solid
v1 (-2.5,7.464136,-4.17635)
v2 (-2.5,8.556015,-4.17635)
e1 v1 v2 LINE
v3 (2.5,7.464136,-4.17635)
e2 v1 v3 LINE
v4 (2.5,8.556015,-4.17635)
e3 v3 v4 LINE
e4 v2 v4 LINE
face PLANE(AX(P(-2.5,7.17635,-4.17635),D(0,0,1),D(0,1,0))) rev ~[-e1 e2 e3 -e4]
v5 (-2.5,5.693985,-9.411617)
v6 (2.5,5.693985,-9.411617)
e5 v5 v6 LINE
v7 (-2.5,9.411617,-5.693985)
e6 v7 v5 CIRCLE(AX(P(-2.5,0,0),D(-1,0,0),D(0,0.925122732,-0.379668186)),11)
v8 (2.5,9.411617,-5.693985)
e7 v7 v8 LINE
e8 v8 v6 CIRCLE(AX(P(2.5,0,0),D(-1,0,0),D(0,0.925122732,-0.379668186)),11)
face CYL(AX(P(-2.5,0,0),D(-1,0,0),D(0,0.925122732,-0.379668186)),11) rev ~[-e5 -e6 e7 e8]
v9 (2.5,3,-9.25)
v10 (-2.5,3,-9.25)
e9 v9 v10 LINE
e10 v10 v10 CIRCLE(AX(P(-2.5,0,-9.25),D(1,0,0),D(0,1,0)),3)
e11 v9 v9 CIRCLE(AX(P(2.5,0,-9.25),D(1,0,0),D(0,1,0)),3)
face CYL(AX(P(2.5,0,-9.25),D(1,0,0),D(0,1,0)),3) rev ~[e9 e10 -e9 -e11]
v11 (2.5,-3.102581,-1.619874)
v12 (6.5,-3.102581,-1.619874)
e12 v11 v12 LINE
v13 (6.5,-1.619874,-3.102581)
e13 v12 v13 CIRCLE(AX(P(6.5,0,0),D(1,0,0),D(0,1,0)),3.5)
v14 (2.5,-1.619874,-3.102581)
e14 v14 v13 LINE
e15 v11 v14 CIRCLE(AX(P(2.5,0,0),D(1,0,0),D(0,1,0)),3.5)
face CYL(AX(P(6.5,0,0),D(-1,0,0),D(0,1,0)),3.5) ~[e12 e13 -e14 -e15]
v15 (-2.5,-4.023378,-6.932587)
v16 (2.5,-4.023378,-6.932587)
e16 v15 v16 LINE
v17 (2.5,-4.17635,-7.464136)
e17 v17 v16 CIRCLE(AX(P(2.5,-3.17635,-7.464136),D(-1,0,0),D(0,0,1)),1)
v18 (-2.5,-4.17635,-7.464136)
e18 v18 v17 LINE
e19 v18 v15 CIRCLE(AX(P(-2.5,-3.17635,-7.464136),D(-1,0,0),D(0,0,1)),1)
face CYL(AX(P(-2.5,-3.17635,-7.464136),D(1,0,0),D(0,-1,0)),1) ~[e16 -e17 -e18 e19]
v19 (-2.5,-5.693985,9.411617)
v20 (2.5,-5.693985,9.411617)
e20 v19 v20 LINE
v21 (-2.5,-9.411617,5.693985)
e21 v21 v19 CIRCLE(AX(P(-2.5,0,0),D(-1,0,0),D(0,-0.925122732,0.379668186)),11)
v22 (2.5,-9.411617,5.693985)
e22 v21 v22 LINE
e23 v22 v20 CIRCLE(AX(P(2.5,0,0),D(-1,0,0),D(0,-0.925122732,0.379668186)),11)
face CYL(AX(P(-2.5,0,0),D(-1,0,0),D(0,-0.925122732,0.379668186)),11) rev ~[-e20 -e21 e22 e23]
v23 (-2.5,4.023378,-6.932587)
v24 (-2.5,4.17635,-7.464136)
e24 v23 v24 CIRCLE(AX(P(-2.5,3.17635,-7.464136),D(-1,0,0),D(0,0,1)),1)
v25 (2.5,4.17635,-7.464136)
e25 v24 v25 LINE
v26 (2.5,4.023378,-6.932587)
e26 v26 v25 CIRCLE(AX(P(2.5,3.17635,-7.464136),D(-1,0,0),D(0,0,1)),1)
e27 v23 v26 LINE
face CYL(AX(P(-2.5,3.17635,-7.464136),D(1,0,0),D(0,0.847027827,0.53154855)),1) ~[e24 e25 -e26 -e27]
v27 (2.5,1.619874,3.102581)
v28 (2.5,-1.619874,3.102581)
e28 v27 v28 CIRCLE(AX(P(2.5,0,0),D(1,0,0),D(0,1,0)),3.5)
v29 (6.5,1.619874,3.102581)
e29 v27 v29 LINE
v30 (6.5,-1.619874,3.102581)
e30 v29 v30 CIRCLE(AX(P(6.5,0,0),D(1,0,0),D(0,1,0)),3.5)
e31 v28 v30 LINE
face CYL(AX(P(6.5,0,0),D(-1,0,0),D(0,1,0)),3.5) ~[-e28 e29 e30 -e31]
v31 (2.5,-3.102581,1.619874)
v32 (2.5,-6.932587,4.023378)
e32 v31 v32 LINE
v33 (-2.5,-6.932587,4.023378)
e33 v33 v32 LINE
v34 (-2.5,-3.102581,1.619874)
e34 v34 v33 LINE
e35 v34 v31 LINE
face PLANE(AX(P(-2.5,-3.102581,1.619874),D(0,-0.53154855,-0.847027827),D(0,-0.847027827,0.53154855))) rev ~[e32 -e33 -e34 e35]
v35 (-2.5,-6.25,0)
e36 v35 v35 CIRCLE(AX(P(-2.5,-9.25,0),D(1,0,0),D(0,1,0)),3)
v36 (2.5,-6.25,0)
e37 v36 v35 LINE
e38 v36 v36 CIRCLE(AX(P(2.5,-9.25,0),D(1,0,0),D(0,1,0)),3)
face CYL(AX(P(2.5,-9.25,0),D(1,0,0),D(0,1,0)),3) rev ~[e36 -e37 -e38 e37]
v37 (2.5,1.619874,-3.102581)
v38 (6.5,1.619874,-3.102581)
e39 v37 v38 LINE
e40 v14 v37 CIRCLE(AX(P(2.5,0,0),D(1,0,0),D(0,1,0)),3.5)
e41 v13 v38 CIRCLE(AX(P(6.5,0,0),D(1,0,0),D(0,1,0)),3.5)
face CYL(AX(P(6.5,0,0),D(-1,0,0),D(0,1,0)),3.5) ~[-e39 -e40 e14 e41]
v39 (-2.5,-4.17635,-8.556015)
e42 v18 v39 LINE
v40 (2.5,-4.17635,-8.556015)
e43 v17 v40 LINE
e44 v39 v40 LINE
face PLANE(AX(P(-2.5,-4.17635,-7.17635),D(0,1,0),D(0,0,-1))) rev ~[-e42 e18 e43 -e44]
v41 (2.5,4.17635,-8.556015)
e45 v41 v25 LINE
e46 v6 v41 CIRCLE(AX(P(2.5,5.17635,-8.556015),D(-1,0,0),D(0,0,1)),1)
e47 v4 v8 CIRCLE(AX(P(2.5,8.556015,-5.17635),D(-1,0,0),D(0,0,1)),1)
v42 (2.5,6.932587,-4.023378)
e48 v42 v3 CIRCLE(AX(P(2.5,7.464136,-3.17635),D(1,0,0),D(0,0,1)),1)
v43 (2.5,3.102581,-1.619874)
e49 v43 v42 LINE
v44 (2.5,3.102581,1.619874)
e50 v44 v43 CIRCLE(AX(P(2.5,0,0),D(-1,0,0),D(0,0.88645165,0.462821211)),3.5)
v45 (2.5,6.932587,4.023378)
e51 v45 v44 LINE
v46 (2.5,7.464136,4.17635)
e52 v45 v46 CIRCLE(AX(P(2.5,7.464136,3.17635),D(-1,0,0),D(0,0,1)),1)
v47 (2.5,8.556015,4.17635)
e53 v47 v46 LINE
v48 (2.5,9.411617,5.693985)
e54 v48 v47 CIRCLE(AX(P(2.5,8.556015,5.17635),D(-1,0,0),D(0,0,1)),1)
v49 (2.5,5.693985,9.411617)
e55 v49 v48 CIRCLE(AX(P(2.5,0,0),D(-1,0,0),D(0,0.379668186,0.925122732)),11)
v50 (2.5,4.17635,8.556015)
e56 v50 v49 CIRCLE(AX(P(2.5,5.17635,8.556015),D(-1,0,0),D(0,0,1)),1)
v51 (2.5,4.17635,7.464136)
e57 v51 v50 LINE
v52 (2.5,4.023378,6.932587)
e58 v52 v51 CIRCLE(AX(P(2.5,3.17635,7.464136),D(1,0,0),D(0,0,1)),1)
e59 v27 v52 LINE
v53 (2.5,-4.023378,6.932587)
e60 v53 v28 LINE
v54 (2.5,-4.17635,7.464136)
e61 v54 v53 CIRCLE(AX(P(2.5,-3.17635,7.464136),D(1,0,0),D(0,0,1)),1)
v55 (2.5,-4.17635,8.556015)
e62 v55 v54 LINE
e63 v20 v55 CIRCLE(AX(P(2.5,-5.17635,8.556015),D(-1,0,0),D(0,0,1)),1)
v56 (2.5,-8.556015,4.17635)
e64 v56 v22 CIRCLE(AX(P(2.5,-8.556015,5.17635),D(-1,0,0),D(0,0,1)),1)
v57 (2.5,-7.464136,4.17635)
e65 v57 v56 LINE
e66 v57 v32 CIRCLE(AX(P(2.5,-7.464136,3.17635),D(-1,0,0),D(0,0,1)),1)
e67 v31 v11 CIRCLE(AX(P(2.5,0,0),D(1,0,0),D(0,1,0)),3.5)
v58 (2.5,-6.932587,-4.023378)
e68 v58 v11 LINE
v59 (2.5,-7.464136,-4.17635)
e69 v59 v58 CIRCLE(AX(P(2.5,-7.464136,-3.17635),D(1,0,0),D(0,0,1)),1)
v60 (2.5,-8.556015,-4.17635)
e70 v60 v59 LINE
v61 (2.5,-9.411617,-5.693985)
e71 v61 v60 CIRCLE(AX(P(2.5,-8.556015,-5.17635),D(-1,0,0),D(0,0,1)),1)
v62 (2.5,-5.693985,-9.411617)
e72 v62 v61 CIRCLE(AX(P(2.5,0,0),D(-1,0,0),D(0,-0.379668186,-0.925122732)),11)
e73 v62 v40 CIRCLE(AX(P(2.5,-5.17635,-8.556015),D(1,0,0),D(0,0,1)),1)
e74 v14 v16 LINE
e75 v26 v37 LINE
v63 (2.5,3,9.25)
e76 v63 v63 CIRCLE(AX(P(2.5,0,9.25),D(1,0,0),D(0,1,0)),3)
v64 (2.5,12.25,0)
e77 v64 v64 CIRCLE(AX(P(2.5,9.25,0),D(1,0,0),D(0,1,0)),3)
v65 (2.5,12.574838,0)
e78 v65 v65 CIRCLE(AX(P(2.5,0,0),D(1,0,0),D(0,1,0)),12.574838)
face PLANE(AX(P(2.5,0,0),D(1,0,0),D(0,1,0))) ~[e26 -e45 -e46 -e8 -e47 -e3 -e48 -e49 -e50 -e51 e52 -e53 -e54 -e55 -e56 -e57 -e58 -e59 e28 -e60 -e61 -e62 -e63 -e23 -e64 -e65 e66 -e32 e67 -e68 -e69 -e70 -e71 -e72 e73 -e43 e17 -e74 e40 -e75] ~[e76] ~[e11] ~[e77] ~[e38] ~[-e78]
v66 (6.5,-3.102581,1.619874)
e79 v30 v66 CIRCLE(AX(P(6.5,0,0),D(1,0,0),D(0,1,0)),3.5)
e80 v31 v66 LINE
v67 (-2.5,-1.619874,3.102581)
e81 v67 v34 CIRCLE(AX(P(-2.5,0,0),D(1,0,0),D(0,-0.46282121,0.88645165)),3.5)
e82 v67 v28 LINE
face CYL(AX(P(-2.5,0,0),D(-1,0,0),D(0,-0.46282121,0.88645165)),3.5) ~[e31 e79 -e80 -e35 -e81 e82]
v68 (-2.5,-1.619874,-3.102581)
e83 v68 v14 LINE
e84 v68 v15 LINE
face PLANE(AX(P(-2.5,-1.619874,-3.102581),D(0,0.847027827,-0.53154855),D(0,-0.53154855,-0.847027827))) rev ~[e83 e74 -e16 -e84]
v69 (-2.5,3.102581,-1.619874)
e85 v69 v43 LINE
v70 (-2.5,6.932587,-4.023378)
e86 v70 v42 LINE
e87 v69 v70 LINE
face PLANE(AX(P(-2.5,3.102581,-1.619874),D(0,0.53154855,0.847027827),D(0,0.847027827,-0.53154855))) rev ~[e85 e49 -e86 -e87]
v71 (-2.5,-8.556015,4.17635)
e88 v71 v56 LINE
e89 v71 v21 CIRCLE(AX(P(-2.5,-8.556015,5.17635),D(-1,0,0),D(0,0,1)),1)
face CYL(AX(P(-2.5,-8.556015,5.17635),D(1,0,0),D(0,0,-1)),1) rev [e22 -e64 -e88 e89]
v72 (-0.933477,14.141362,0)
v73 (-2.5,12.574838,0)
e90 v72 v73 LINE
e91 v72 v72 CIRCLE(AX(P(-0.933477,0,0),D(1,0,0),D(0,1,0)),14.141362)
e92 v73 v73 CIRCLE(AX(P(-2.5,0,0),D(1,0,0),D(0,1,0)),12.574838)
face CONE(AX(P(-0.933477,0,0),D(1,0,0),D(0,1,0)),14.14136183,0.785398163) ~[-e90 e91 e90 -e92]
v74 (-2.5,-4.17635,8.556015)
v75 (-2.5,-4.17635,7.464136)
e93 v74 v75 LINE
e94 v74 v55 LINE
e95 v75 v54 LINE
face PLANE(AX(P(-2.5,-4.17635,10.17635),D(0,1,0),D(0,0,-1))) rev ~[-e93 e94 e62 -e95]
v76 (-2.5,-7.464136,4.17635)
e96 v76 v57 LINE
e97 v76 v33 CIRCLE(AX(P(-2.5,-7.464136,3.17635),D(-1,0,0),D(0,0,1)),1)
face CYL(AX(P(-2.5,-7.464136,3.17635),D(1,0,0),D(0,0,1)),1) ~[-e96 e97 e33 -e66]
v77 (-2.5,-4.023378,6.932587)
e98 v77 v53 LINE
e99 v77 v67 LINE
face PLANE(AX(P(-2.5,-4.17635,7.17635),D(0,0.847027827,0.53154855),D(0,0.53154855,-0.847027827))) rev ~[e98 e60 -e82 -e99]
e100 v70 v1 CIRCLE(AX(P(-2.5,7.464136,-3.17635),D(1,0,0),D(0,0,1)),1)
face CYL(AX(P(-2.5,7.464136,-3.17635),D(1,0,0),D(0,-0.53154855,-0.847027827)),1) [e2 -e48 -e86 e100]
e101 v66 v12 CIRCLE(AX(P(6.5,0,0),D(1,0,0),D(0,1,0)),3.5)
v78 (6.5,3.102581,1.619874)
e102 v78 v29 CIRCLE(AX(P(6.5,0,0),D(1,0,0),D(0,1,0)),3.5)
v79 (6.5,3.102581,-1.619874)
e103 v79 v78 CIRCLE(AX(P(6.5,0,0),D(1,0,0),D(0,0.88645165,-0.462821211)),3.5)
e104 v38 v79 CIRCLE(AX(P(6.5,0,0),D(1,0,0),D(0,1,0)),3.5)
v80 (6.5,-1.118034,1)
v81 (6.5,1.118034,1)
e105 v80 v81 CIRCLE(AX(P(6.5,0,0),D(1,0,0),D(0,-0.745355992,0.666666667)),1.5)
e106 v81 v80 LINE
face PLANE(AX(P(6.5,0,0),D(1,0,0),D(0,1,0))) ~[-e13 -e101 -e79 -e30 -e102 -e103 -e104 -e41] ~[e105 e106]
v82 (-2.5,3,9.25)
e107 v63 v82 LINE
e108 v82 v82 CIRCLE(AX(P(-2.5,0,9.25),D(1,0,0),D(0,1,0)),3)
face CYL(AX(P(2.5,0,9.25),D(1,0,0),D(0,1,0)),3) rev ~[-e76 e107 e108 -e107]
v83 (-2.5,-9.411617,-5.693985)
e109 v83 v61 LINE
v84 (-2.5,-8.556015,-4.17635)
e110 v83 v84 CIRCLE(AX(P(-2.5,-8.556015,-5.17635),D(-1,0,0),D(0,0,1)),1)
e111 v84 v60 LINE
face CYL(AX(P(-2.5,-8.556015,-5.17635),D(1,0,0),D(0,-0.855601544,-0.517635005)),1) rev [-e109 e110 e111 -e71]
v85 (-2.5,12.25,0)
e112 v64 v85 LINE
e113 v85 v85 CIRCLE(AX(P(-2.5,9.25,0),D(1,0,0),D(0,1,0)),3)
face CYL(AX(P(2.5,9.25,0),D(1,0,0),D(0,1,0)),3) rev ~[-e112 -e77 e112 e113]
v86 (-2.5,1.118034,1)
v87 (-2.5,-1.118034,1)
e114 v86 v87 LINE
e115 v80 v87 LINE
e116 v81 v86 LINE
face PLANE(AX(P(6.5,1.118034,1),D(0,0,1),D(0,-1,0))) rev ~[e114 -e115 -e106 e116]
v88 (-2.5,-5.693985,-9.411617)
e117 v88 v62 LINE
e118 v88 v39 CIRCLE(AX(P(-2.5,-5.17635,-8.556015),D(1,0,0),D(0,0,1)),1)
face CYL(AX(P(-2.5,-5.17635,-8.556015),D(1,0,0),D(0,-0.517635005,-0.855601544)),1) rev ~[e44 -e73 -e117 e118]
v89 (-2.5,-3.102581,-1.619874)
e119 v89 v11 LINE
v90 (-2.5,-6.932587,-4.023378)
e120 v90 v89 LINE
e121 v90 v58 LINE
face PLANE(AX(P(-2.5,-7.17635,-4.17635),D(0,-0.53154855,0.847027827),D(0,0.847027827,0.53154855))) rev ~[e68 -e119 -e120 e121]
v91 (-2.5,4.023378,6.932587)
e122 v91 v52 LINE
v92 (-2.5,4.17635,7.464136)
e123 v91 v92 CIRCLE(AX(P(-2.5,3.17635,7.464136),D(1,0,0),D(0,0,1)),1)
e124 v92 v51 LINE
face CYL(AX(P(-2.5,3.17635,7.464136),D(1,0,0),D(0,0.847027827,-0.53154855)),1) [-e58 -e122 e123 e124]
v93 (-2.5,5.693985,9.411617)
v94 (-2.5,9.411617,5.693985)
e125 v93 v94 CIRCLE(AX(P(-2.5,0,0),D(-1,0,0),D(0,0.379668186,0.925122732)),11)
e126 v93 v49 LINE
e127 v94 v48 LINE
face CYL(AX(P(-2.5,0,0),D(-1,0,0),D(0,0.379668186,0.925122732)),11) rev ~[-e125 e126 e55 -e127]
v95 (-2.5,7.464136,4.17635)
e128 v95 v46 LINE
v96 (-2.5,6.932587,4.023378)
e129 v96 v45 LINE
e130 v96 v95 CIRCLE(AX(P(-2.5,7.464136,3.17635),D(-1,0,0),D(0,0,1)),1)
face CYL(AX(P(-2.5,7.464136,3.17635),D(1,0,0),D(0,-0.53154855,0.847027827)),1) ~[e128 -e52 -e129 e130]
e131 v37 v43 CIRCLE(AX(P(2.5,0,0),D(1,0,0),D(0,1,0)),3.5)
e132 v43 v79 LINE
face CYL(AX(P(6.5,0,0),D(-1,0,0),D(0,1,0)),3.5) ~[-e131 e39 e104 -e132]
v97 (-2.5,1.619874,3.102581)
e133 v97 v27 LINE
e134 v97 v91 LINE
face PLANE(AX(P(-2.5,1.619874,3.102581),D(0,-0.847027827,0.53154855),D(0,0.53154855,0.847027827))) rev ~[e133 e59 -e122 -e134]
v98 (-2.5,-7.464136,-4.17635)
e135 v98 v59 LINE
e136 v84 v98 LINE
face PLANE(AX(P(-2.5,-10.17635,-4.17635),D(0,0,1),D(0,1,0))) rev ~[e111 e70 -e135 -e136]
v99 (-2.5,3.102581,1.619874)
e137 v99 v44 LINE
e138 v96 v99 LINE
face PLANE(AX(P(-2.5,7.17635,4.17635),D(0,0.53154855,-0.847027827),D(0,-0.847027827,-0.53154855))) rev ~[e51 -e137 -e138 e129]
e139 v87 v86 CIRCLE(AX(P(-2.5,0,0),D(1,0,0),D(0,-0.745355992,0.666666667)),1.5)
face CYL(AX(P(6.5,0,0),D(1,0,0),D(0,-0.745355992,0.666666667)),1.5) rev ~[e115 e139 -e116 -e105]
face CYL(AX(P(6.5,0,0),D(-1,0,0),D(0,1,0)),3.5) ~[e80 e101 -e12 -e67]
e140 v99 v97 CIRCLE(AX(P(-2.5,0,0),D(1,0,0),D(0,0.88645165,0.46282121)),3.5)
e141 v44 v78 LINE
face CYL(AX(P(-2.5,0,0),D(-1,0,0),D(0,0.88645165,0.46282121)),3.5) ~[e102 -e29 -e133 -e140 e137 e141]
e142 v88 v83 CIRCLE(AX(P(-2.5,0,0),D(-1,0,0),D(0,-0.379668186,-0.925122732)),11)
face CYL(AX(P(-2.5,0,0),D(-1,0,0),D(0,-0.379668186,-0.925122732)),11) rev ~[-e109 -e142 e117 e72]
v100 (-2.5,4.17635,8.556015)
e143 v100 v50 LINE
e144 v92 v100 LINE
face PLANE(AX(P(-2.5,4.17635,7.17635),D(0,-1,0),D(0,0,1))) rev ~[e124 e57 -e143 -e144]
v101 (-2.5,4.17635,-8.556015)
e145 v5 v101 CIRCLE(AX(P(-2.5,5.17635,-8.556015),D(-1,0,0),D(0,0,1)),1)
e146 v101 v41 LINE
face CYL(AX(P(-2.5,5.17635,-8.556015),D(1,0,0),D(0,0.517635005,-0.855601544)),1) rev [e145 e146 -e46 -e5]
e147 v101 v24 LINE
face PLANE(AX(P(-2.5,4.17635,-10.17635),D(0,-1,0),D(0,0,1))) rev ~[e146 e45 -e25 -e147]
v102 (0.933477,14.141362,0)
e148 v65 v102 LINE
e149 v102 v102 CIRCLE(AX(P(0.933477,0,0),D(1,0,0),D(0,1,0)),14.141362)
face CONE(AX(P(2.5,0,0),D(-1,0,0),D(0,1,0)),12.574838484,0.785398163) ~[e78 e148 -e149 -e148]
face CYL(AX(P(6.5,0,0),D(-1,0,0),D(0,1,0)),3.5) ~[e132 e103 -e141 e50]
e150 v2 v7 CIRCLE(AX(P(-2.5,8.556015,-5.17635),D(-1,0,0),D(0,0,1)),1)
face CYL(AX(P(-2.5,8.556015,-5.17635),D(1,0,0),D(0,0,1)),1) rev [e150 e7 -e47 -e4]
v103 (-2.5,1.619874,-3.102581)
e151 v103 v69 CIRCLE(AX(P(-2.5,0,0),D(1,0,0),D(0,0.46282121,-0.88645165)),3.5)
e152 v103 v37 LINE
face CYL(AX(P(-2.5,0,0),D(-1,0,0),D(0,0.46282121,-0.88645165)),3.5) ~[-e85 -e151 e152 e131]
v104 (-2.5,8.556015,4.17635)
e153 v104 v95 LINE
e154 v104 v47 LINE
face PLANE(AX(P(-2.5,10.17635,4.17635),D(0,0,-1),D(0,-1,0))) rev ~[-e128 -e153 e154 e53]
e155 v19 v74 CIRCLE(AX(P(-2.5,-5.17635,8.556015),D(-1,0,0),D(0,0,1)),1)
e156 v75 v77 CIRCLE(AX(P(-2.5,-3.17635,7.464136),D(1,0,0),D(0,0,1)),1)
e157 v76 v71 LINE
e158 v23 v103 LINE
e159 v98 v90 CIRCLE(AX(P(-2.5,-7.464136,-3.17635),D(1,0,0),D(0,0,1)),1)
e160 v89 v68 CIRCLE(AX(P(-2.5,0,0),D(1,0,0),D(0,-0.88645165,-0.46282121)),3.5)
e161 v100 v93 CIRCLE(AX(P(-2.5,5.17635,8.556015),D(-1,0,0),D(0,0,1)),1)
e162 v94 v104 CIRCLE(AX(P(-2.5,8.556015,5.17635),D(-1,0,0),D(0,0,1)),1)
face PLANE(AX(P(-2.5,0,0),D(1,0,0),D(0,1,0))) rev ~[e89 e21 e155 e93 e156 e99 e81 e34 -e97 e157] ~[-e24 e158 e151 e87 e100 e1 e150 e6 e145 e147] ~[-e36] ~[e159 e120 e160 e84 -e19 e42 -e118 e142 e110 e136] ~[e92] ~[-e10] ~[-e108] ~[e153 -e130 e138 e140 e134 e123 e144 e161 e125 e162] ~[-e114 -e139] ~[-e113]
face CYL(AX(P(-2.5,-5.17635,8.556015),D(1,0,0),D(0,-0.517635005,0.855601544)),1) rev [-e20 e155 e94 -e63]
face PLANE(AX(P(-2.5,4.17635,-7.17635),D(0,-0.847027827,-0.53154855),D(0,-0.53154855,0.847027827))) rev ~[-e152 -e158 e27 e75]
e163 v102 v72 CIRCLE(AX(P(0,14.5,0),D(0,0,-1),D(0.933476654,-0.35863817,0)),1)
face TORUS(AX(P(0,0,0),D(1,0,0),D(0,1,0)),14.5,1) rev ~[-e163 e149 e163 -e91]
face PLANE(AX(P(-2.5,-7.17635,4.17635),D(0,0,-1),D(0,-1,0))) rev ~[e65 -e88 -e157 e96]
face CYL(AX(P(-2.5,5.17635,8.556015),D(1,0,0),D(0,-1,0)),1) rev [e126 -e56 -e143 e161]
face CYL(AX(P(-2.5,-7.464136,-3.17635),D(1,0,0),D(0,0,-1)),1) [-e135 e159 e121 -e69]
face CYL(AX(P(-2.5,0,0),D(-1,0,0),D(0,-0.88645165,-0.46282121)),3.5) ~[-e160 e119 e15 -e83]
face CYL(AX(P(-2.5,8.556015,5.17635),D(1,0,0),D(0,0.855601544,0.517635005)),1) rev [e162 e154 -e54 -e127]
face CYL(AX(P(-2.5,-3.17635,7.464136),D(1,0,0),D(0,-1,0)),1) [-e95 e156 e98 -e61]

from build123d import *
from build123d import SkipClean  # not in build123d's __all__

# Parameters (mm, degrees)
F3_DEPTH = 25
F5_DEPTH = 25
F6_R     = 1
F7_R     = 3
F8_DEPTH = 25


with BuildPart() as f1:
    # F0 (on Top) → F1 (revolve)
    with BuildSketch(Plane.XY):
        with BuildLine():
            Line((-2.5, 12.5748384835), (-2.5, 0))
            Line((-2.5, 0), (6.5, 0))
            Line((6.5, 0), (6.5, 3.5))
            Line((6.5, 3.5), (2.5, 3.5))
            Line((2.5, 3.5), (2.5, 12.5748384835))
            Line((2.5, 12.5748384835), (0.9334766536, 14.1413618298))
            ThreePointArc((0.9334766536, 14.1413618298), (0, 13.5), (-0.9334766536, 14.1413618298))
            Line((-0.9334766536, 14.1413618298), (-2.5, 12.5748384835))
        make_face()
    revolve(axis=Axis((2, 0, 0), (1, 0, 0)))

    # F2 (on face) → F3 (cut)
    with BuildSketch(Plane(origin=(-2.5, 0, 0), x_dir=(0, -1, 0), z_dir=(-1, 0, 0))):
        with BuildLine():
            Line((-4.1763500472, 7.1763500472), (-4.1763500472, 10.1763500472))
            ThreePointArc((-4.1763500472, 10.1763500472), (-7.7781745931, 7.7781745931), (-10.1763500472, 4.1763500472))
            Line((-10.1763500472, 4.1763500472), (-7.1763500472, 4.1763500472))
            Line((-7.1763500472, 4.1763500472), (-3.1025807736, 1.6198742369))
            ThreePointArc((-3.1025807736, 1.6198742369), (-2.4748737342, 2.4748737342), (-1.6198742369, 3.1025807736))
            Line((-1.6198742369, 3.1025807736), (-4.1763500472, 7.1763500472))
        make_face()
        with BuildLine():
            ThreePointArc((10.1763500472, 4.1763500472), (7.7781745931, 7.7781745931), (4.1763500472, 10.1763500472))
            Line((4.1763500472, 10.1763500472), (4.1763500472, 7.1763500472))
            Line((4.1763500472, 7.1763500472), (1.6198742369, 3.1025807736))
            ThreePointArc((1.6198742369, 3.1025807736), (2.4748737342, 2.4748737342), (3.1025807736, 1.6198742369))
            Line((3.1025807736, 1.6198742369), (7.1763500472, 4.1763500472))
            Line((7.1763500472, 4.1763500472), (10.1763500472, 4.1763500472))
        make_face()
        with BuildLine():
            Line((-7.1763500472, -4.1763500472), (-10.1763500472, -4.1763500472))
            ThreePointArc((-10.1763500472, -4.1763500472), (-7.7781745931, -7.7781745931), (-4.1763500472, -10.1763500472))
            Line((-4.1763500472, -10.1763500472), (-4.1763500472, -7.1763500472))
            Line((-4.1763500472, -7.1763500472), (-1.6198742369, -3.1025807736))
            ThreePointArc((-1.6198742369, -3.1025807736), (-2.4748737342, -2.4748737342), (-3.1025807736, -1.6198742369))
            Line((-3.1025807736, -1.6198742369), (-7.1763500472, -4.1763500472))
        make_face()
        with BuildLine():
            Line((10.1763500472, -4.1763500472), (7.1763500472, -4.1763500472))
            Line((7.1763500472, -4.1763500472), (3.1025807736, -1.6198742369))
            ThreePointArc((3.1025807736, -1.6198742369), (2.4748737342, -2.4748737342), (1.6198742369, -3.1025807736))
            Line((1.6198742369, -3.1025807736), (4.1763500472, -7.1763500472))
            Line((4.1763500472, -7.1763500472), (4.1763500472, -10.1763500472))
            ThreePointArc((4.1763500472, -10.1763500472), (7.7781745931, -7.7781745931), (10.1763500472, -4.1763500472))
        make_face()
    with SkipClean():  # cleaning this boolean's faces spoils the solid; the shape is the same uncleaned
        extrude(amount=-F3_DEPTH, mode=Mode.SUBTRACT)

    # F4 (on face) → F5 (cut)
    with BuildSketch(Plane.YZ.offset(6.5)):
        with BuildLine():
            Line((1.1180339887, 1), (-1.1180339887, 1))
            ThreePointArc((-1.1180339887, 1), (0, -1.5), (1.1180339887, 1))
        make_face()
    with SkipClean():  # cleaning this boolean's faces spoils the solid; the shape is the same uncleaned
        extrude(amount=-F5_DEPTH, mode=Mode.SUBTRACT)

    # F6
    f6_edges = [f1.edges().sort_by_distance(p)[0] for p in [
        (0, -10.17635, 4.17635),
        (0, 4.17635, -10.17635),
        (0, -4.17635, -10.17635),
        (0, -10.17635, -4.17635),
        (0, 10.17635, -4.17635),
        (0, 10.17635, 4.17635),
        (0, 4.17635, 10.17635),
        (0, -4.17635, 10.17635),
        (0, -4.17635, -7.17635),
        (0, -7.17635, -4.17635),
        (0, 7.17635, -4.17635),
        (0, 4.17635, -7.17635),
        (0, -7.17635, 4.17635),
        (0, -4.17635, 7.17635),
        (0, 7.17635, 4.17635),
        (0, 4.17635, 7.17635),
    ]]
    fillet(f6_edges, radius=F6_R)

    # F7 (on face) → F8 (cut)
    with BuildSketch(Plane.YZ.offset(2.5)):
        with Locations((0, 9.25)):
            Circle(F7_R)
        with Locations((-9.25, 0)):
            Circle(F7_R)
        with Locations((9.25, 0)):
            Circle(F7_R)
        with Locations((0, -9.25)):
            Circle(F7_R)
    with SkipClean():  # cleaning this boolean's faces spoils the solid; the shape is the same uncleaned
        extrude(amount=-F8_DEPTH, mode=Mode.SUBTRACT)


solid = f1.part
